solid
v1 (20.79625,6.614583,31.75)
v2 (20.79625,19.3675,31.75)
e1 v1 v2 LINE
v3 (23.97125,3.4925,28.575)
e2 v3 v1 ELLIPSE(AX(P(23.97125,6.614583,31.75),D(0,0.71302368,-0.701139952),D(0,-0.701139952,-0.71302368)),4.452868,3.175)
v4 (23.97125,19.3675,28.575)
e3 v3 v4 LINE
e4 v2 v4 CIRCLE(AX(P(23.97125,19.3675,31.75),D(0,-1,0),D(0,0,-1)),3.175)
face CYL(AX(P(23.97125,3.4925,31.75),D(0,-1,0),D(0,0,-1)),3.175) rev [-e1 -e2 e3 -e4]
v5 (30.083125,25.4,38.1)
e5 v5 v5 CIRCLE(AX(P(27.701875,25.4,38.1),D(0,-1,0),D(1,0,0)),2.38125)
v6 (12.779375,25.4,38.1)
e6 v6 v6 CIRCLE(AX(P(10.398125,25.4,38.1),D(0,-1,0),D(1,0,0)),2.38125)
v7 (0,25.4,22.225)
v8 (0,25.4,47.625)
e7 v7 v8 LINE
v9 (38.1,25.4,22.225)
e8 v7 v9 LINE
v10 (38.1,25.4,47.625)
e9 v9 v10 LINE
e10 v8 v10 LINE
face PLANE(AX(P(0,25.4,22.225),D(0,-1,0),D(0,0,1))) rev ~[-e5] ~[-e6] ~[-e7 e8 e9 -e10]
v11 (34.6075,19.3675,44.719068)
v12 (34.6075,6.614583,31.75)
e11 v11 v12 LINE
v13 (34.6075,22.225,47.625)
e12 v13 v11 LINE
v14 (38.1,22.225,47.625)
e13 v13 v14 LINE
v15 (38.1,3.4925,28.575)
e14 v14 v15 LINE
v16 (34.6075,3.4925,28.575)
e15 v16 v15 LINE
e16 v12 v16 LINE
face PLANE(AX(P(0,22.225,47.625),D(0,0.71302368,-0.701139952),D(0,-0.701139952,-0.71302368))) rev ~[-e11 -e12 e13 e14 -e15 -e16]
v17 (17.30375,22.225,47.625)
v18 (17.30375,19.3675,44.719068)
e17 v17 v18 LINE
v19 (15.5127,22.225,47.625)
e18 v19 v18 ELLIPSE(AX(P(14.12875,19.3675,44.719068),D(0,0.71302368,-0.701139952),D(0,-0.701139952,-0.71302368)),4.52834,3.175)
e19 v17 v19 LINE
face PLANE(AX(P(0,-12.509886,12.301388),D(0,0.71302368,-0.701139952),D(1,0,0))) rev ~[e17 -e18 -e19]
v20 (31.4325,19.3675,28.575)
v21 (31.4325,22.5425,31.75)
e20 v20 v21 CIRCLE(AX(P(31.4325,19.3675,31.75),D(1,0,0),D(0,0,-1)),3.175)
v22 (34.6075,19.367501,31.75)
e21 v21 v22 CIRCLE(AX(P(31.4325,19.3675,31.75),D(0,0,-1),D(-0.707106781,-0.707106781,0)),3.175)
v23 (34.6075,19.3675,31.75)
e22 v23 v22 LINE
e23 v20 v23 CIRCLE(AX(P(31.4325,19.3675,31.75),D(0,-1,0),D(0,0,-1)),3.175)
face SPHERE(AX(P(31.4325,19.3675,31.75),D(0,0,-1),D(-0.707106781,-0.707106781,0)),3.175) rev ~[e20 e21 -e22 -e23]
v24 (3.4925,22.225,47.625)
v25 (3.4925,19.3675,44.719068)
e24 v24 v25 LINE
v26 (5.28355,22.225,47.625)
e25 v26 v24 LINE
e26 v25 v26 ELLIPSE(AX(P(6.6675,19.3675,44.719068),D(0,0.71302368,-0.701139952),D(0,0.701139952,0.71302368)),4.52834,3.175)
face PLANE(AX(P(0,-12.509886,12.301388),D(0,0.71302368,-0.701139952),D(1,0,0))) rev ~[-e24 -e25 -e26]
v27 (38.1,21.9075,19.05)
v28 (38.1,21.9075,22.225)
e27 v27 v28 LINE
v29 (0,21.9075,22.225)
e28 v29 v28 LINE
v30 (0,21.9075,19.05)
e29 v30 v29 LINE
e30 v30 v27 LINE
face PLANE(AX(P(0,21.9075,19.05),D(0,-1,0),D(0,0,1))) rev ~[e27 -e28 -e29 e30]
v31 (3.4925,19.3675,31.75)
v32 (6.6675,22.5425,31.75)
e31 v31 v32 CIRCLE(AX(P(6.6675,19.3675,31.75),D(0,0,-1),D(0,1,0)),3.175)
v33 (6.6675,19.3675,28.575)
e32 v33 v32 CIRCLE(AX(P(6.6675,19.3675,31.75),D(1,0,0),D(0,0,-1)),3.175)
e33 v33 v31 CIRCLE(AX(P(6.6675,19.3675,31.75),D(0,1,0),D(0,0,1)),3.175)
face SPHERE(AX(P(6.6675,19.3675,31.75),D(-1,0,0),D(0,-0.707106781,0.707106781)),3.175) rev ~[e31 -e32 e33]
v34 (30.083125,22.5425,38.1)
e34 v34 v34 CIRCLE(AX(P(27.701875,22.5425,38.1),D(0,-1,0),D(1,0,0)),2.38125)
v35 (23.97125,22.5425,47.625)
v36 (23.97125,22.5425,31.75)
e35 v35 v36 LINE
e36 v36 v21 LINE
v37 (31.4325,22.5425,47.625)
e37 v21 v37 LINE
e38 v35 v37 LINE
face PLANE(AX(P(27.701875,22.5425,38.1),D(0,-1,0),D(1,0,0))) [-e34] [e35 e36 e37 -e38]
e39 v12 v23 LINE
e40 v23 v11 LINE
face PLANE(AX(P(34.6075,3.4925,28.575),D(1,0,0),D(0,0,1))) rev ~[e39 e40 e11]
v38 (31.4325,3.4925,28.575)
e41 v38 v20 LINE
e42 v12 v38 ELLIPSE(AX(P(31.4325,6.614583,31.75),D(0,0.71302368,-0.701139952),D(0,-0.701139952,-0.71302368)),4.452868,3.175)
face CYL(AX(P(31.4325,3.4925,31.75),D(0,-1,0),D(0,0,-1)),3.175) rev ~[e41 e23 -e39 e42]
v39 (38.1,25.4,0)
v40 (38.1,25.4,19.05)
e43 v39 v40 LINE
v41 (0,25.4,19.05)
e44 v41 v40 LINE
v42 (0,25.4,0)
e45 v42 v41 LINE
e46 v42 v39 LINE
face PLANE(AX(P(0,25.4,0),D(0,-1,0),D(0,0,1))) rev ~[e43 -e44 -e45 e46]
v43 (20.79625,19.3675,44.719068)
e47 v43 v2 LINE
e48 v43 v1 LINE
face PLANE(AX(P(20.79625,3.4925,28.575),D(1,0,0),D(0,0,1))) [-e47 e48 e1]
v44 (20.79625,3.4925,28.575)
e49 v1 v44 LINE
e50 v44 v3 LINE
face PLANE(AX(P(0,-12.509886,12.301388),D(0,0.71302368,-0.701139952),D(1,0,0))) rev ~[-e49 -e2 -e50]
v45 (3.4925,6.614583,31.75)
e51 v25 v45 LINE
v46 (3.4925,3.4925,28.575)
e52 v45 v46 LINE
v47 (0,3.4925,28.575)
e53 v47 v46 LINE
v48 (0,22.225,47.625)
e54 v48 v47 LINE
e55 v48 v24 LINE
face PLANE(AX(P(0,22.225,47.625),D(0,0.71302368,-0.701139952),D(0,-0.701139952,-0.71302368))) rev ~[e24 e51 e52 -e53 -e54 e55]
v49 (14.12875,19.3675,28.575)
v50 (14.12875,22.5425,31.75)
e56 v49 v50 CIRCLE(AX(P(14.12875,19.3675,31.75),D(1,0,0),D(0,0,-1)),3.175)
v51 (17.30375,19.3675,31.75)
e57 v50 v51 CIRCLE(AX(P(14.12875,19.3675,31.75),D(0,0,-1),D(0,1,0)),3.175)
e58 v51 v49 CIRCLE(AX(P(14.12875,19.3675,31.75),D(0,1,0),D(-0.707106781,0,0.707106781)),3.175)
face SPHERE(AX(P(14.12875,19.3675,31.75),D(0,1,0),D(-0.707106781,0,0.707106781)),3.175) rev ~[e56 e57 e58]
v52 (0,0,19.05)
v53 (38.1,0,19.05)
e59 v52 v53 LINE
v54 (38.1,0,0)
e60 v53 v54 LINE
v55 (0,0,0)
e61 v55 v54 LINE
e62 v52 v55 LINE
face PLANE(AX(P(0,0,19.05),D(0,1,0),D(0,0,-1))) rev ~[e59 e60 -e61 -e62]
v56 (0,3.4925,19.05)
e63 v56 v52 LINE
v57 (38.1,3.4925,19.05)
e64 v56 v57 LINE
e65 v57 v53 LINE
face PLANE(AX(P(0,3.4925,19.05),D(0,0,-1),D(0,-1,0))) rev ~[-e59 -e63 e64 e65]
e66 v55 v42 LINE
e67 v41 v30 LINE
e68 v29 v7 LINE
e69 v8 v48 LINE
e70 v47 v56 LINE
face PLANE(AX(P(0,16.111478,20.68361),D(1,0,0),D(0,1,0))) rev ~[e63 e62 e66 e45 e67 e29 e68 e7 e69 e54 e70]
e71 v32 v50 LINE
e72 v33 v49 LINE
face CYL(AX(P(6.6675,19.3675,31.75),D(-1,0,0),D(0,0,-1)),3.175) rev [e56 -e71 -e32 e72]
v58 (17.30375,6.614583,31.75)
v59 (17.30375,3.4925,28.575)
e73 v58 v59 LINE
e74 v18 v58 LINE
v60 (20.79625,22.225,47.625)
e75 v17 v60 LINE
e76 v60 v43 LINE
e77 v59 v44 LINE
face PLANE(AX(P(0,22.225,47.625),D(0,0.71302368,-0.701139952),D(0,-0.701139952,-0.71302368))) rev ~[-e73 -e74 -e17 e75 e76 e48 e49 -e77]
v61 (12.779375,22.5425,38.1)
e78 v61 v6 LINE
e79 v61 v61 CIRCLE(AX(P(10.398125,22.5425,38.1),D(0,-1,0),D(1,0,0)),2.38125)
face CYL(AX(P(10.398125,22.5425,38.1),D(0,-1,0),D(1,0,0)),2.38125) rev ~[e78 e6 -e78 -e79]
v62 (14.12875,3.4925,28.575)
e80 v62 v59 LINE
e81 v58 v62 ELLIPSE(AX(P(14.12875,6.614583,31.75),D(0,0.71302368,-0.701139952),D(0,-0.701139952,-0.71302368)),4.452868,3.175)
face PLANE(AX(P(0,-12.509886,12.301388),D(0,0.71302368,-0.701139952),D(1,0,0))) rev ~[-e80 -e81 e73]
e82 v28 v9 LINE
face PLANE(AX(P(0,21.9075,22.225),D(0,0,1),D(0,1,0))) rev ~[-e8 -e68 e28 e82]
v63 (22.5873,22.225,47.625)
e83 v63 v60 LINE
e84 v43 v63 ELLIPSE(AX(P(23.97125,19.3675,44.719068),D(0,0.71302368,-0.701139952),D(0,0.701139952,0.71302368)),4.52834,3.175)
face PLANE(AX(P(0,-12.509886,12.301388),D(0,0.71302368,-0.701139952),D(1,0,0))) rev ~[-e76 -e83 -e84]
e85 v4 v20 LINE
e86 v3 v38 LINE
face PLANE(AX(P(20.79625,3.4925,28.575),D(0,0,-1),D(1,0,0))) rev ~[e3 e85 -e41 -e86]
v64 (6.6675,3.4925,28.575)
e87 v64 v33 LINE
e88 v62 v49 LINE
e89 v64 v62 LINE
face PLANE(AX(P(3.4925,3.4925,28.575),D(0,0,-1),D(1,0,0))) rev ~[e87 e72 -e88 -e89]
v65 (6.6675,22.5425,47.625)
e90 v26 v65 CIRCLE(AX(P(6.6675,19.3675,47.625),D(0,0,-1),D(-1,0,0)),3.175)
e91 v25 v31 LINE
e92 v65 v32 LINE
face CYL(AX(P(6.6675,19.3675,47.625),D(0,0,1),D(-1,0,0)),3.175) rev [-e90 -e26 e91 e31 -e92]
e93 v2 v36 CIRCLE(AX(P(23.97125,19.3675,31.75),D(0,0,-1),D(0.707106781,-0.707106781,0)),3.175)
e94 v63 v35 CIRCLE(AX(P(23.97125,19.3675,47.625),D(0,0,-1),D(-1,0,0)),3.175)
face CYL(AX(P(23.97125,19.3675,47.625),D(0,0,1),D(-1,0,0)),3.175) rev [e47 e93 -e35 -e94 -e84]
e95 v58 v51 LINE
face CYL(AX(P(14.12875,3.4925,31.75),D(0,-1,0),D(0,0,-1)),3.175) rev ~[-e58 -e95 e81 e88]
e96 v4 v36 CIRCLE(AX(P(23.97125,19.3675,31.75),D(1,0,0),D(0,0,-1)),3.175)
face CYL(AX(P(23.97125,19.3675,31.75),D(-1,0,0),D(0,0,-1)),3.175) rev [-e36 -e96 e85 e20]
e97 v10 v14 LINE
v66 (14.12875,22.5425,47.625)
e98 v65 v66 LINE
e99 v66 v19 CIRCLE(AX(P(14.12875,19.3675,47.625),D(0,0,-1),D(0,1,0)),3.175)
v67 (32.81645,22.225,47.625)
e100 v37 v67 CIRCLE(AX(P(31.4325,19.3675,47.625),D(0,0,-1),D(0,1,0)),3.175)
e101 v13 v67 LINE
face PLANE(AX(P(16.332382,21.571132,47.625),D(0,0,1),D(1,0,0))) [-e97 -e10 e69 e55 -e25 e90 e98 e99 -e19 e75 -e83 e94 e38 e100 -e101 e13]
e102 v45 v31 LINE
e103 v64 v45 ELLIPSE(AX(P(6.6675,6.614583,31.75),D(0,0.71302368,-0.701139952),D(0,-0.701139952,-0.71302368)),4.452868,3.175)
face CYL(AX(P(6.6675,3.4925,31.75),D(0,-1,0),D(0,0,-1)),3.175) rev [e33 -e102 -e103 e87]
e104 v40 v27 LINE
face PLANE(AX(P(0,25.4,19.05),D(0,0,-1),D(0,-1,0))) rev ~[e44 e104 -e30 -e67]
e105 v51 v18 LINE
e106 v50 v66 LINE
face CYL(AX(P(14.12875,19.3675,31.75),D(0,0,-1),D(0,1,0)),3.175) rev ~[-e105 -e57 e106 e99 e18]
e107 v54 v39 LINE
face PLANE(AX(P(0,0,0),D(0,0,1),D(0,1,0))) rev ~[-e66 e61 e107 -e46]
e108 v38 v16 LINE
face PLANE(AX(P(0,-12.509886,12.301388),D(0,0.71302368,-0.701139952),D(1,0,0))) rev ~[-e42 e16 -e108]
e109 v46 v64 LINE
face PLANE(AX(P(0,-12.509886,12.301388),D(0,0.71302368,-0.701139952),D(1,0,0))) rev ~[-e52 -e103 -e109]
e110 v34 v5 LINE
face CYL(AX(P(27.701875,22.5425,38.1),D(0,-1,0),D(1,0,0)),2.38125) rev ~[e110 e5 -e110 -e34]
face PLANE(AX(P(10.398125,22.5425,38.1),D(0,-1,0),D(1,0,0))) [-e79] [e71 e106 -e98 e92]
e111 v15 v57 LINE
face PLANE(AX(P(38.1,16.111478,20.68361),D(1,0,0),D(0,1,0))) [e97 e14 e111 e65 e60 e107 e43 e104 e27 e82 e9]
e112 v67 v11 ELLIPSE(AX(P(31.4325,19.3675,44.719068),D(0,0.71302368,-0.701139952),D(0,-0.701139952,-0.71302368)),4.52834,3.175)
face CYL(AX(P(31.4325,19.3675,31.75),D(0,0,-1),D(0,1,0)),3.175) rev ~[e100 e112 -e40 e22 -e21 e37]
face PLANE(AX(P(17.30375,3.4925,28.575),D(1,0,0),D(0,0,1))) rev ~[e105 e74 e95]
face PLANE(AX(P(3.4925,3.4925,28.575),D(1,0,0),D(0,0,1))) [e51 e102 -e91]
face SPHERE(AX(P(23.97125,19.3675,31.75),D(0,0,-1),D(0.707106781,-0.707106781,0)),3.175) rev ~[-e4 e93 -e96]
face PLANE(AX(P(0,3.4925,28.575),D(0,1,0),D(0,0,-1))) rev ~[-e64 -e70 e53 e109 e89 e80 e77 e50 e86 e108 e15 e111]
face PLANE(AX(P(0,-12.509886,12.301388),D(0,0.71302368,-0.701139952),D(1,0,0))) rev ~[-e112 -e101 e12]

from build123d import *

# Parameters (mm, degrees)
F1_DEPTH     = 38.1
F2_W         = 13.81125
F2_H         = 19.05
F3_DEPTH     = 19.05
F4_T1_DEPTH  = 7.46125
F4_T3_DEPTH  = 7.46125
F4_S7_W      = 3.175
F4_S7_H      = 3.175
F4_T8_DEPTH  = 3.175
F4_S13_W     = 3.175
F4_S13_H     = 3.175
F4_T14_DEPTH = 3.175
F4_S19_W     = 3.175
F4_S19_H     = 3.175
F4_T20_DEPTH = 3.175
F4_S25_W     = 3.175
F4_S25_H     = 3.175
F4_T26_DEPTH = 3.175
F4_T32_DEPTH = 15.875
F4_T37_DEPTH = 15.875
F4_T42_DEPTH = 15.875
F4_T47_DEPTH = 15.875
F4_T52_DEPTH = 15.875
F4_T57_DEPTH = 15.875
F4_T62_DEPTH = 15.875
F4_T67_DEPTH = 15.875
F6_DEPTH     = 2.8585


# Not quite as in the source:
# - a fillet or chamfer that OpenCascade refuses, or shapes differently, is made with other operations: its cross-section is extruded or revolved along the edge and cut away or added


with BuildPart() as f1:
    # F0 (on Right) → F1 (new body)
    with BuildSketch(Plane.YZ):
        Polygon((0, 19.05), (0, 0), (25.4, 0), (25.4, 19.05), (21.9075, 19.05), (21.9075, 22.225), (25.4, 22.225), (25.4, 47.625), (22.225, 47.625), (22.225, 28.575), (3.4925, 28.575), (3.4925, 19.05), align=None)
        Polygon((22.225, 47.625), (3.4925, 28.575), (22.225, 28.575), align=None)
    extrude(amount=F1_DEPTH)

    # F2 (on face) → F3 (cut)
    with BuildSketch(Plane.XZ.offset(-3.4925)):
        with Locations((27.701875, 38.1)):
            Rectangle(F2_W, F2_H)
        with Locations((10.398125, 38.1)):
            Rectangle(F2_W, F2_H)
    extrude(amount=-F3_DEPTH, mode=Mode.SUBTRACT)

    # F4: fillet of radius 3.175 on 10 edges, made by hand

    # F4_s2 → F4_t1 (join)
    with BuildSketch(Plane.YZ.offset(6.6675)):
        with BuildLine():
            ThreePointArc((19.3675, 28.575), (21.6125640303, 29.5049359697), (22.5425, 31.75))
            Line((22.5425, 31.75), (22.5425, 28.575))
            Line((22.5425, 28.575), (19.3675, 28.575))
        make_face()
    extrude(amount=F4_T1_DEPTH)

    # F4_s4 → F4_t3 (join)
    with BuildSketch(Plane.YZ.offset(23.97125)):
        with BuildLine():
            ThreePointArc((19.3675, 28.575), (21.6125640303, 29.5049359697), (22.5425, 31.75))
            Line((22.5425, 31.75), (22.5425, 28.575))
            Line((22.5425, 28.575), (19.3675, 28.575))
        make_face()
    extrude(amount=F4_T3_DEPTH)


with BuildPart() as f4_tool6:
    # F4_s7 → F4_t8 (new body)
    with BuildSketch(Plane.YZ.offset(6.6675)):
        with Locations((20.955, 30.1625)):
            Rectangle(F4_S7_W, F4_S7_H)
    extrude(amount=-F4_T8_DEPTH)

    # F4_s9 → F4_t10 (revolve, cut)
    with BuildSketch(Plane(origin=(6.6675, 19.3675, 31.75), x_dir=(0, -0.7071067812, 0.7071067812), z_dir=(0, -0.7071067812, -0.7071067812))):
        with BuildLine():
            ThreePointArc((0, -3.175), (3.175, 0), (0, 3.175))
            Line((0, 3.175), (0, -3.175))
        make_face()
    revolve(axis=Axis((6.6675, 19.3675, 31.75), (-1, 0, 0)), mode=Mode.SUBTRACT)


with BuildPart() as f1_1:
    add(f1.part)

    # F4_t5: union F4_tool6
    add(f4_tool6.part)


with BuildPart() as f4_tool12:
    # F4_s13 → F4_t14 (new body)
    with BuildSketch(Plane.XZ.offset(-19.3675)):
        with Locations((15.71625, 30.1625)):
            Rectangle(F4_S13_W, F4_S13_H)
    extrude(amount=-F4_T14_DEPTH)

    # F4_s15 → F4_t16 (revolve, cut)
    with BuildSketch(Plane(origin=(14.12875, 19.3675, 31.75), x_dir=(-0.7071067812, 0, 0.7071067812), z_dir=(-0.7071067812, 0, -0.7071067812))):
        with BuildLine():
            ThreePointArc((0, -3.175), (3.175, 0), (0, 3.175))
            Line((0, 3.175), (0, -3.175))
        make_face()
    revolve(axis=Axis((14.12875, 19.3675, 31.75), (0, 1, 0)), mode=Mode.SUBTRACT)


with BuildPart() as f1_2:
    add(f1_1.part)

    # F4_t11: union F4_tool12
    add(f4_tool12.part)


with BuildPart() as f4_tool18:
    # F4_s19 → F4_t20 (new body)
    with BuildSketch(Plane.XY.offset(31.75)):
        with Locations((22.38375, 20.955)):
            Rectangle(F4_S19_W, F4_S19_H)
    extrude(amount=-F4_T20_DEPTH)

    # F4_s21 → F4_t22 (revolve, cut)
    with BuildSketch(Plane(origin=(23.97125, 19.3675, 31.75), x_dir=(0.7071067812, -0.7071067812, 0), z_dir=(0.7071067812, 0.7071067812, 0))):
        with BuildLine():
            ThreePointArc((0, -3.175), (3.175, 0), (0, 3.175))
            Line((0, 3.175), (0, -3.175))
        make_face()
    revolve(axis=Axis((23.97125, 19.3675, 31.75), (0, 0, -1)), mode=Mode.SUBTRACT)


with BuildPart() as f1_3:
    add(f1_2.part)

    # F4_t17: union F4_tool18
    add(f4_tool18.part)


with BuildPart() as f4_tool24:
    # F4_s25 → F4_t26 (new body)
    with BuildSketch(Plane.XY.offset(31.75)):
        with Locations((33.02, 20.955)):
            Rectangle(F4_S25_W, F4_S25_H)
    extrude(amount=-F4_T26_DEPTH)

    # F4_s27 → F4_t28 (revolve, cut)
    with BuildSketch(Plane(origin=(31.4325, 19.3675, 31.75), x_dir=(-0.7071067812, -0.7071067812, 0), z_dir=(0.7071067812, -0.7071067812, 0))):
        with BuildLine():
            ThreePointArc((0, -3.175), (3.175, 0), (0, 3.175))
            Line((0, 3.175), (0, -3.175))
        make_face()
    revolve(axis=Axis((31.4325, 19.3675, 31.75), (0, 0, -1)), mode=Mode.SUBTRACT)


with BuildPart() as f1_4:
    add(f1_3.part)

    # F4_t23: union F4_tool24
    add(f4_tool24.part)


with BuildPart() as f4_tool30:
    # F4_s31 → F4_t32 (new body)
    with BuildSketch(Plane.XY.offset(47.625)):
        with BuildLine():
            ThreePointArc((20.79625, 19.3675), (21.7261859697, 21.6125640303), (23.97125, 22.5425))
            Line((23.97125, 22.5425), (20.79625, 22.5425))
            Line((20.79625, 22.5425), (20.79625, 19.3675))
        make_face()
    extrude(amount=-F4_T32_DEPTH)

    split(bisect_by=Plane(origin=(0, -12.5098856094, 12.3013875159), x_dir=(1, 0, 0), z_dir=(0, 0.7130236798, -0.7011399518)), keep=Keep.TOP)


with BuildPart() as f1_5:
    add(f1_4.part)

    # F4_t29: union F4_tool30
    add(f4_tool30.part)


with BuildPart() as f4_tool35:
    # F4_s36 → F4_t37 (new body)
    with BuildSketch(Plane.XZ.offset(-3.4925)):
        with BuildLine():
            ThreePointArc((23.97125, 28.575), (21.7261859697, 29.5049359697), (20.79625, 31.75))
            Line((20.79625, 31.75), (20.79625, 28.575))
            Line((20.79625, 28.575), (23.97125, 28.575))
        make_face()
    extrude(amount=-F4_T37_DEPTH)

    split(bisect_by=Plane(origin=(0, -12.5098856094, 12.3013875159), x_dir=(1, 0, 0), z_dir=(0, 0.7130236798, -0.7011399518)), keep=Keep.TOP)


with BuildPart() as f1_6:
    add(f1_5.part)

    # F4_t34: union F4_tool35
    add(f4_tool35.part)


with BuildPart() as f4_tool40:
    # F4_s41 → F4_t42 (new body)
    with BuildSketch(Plane.XY.offset(47.625)):
        with BuildLine():
            ThreePointArc((3.4925, 19.3675), (4.4224359697, 21.6125640303), (6.6675, 22.5425))
            Line((6.6675, 22.5425), (3.4925, 22.5425))
            Line((3.4925, 22.5425), (3.4925, 19.3675))
        make_face()
    extrude(amount=-F4_T42_DEPTH)

    split(bisect_by=Plane(origin=(0, -12.5098856094, 12.3013875159), x_dir=(1, 0, 0), z_dir=(0, 0.7130236798, -0.7011399518)), keep=Keep.TOP)


with BuildPart() as f1_7:
    add(f1_6.part)

    # F4_t39: union F4_tool40
    add(f4_tool40.part)


with BuildPart() as f4_tool45:
    # F4_s46 → F4_t47 (new body)
    with BuildSketch(Plane.XZ.offset(-3.4925)):
        with BuildLine():
            ThreePointArc((6.6675, 28.575), (4.4224359697, 29.5049359697), (3.4925, 31.75))
            Line((3.4925, 31.75), (3.4925, 28.575))
            Line((3.4925, 28.575), (6.6675, 28.575))
        make_face()
    extrude(amount=-F4_T47_DEPTH)

    split(bisect_by=Plane(origin=(0, -12.5098856094, 12.3013875159), x_dir=(1, 0, 0), z_dir=(0, 0.7130236798, -0.7011399518)), keep=Keep.TOP)


with BuildPart() as f1_8:
    add(f1_7.part)

    # F4_t44: union F4_tool45
    add(f4_tool45.part)


with BuildPart() as f4_tool50:
    # F4_s51 → F4_t52 (new body)
    with BuildSketch(Plane.XZ.offset(-3.4925)):
        with BuildLine():
            ThreePointArc((31.4325, 28.575), (33.6775640303, 29.5049359697), (34.6075, 31.75))
            Line((34.6075, 31.75), (34.6075, 28.575))
            Line((34.6075, 28.575), (31.4325, 28.575))
        make_face()
    extrude(amount=-F4_T52_DEPTH)

    split(bisect_by=Plane(origin=(0, -12.5098856094, 12.3013875159), x_dir=(1, 0, 0), z_dir=(0, 0.7130236798, -0.7011399518)), keep=Keep.TOP)


with BuildPart() as f1_9:
    add(f1_8.part)

    # F4_t49: union F4_tool50
    add(f4_tool50.part)


with BuildPart() as f4_tool55:
    # F4_s56 → F4_t57 (new body)
    with BuildSketch(Plane.XY.offset(31.75)):
        with BuildLine():
            ThreePointArc((31.4325, 22.5425), (33.6775640303, 21.6125640303), (34.6075, 19.3675))
            Line((34.6075, 19.3675), (34.6075, 22.5425))
            Line((34.6075, 22.5425), (31.4325, 22.5425))
        make_face()
    extrude(amount=F4_T57_DEPTH)

    split(bisect_by=Plane(origin=(0, -12.5098856094, 12.3013875159), x_dir=(1, 0, 0), z_dir=(0, 0.7130236798, -0.7011399518)), keep=Keep.TOP)


with BuildPart() as f1_10:
    add(f1_9.part)

    # F4_t54: union F4_tool55
    add(f4_tool55.part)


with BuildPart() as f4_tool60:
    # F4_s61 → F4_t62 (new body)
    with BuildSketch(Plane.XZ.offset(-3.4925)):
        with BuildLine():
            ThreePointArc((14.12875, 28.575), (16.3738140303, 29.5049359697), (17.30375, 31.75))
            Line((17.30375, 31.75), (17.30375, 28.575))
            Line((17.30375, 28.575), (14.12875, 28.575))
        make_face()
    extrude(amount=-F4_T62_DEPTH)

    split(bisect_by=Plane(origin=(0, -12.5098856094, 12.3013875159), x_dir=(1, 0, 0), z_dir=(0, 0.7130236798, -0.7011399518)), keep=Keep.TOP)


with BuildPart() as f1_11:
    add(f1_10.part)

    # F4_t59: union F4_tool60
    add(f4_tool60.part)


with BuildPart() as f4_tool65:
    # F4_s66 → F4_t67 (new body)
    with BuildSketch(Plane.XY.offset(31.75)):
        with BuildLine():
            ThreePointArc((14.12875, 22.5425), (16.3738140303, 21.6125640303), (17.30375, 19.3675))
            Line((17.30375, 19.3675), (17.30375, 22.5425))
            Line((17.30375, 22.5425), (14.12875, 22.5425))
        make_face()
    extrude(amount=F4_T67_DEPTH)

    split(bisect_by=Plane(origin=(0, -12.5098856094, 12.3013875159), x_dir=(1, 0, 0), z_dir=(0, 0.7130236798, -0.7011399518)), keep=Keep.TOP)


with BuildPart() as f1_12:
    add(f1_11.part)

    # F4_t64: union F4_tool65
    add(f4_tool65.part)

    # F5 (on face) → F6 (cut, through all)
    with BuildSketch(Plane.XZ.offset(-22.5425)):
        with BuildLine():
            ThreePointArc((10.398125, 35.71875), (12.0819230227, 36.4162019773), (12.779375, 38.1))
            ThreePointArc((12.779375, 38.1), (8.7143269773, 39.7837980227), (10.398125, 35.71875))
        make_face()
        with BuildLine():
            ThreePointArc((27.701875, 35.71875), (29.3856730227, 36.4162019773), (30.083125, 38.1))
            ThreePointArc((30.083125, 38.1), (26.0180769773, 39.7837980227), (27.701875, 35.71875))
        make_face()
    extrude(amount=-F6_DEPTH, mode=Mode.SUBTRACT)


solid = f1_12.part
